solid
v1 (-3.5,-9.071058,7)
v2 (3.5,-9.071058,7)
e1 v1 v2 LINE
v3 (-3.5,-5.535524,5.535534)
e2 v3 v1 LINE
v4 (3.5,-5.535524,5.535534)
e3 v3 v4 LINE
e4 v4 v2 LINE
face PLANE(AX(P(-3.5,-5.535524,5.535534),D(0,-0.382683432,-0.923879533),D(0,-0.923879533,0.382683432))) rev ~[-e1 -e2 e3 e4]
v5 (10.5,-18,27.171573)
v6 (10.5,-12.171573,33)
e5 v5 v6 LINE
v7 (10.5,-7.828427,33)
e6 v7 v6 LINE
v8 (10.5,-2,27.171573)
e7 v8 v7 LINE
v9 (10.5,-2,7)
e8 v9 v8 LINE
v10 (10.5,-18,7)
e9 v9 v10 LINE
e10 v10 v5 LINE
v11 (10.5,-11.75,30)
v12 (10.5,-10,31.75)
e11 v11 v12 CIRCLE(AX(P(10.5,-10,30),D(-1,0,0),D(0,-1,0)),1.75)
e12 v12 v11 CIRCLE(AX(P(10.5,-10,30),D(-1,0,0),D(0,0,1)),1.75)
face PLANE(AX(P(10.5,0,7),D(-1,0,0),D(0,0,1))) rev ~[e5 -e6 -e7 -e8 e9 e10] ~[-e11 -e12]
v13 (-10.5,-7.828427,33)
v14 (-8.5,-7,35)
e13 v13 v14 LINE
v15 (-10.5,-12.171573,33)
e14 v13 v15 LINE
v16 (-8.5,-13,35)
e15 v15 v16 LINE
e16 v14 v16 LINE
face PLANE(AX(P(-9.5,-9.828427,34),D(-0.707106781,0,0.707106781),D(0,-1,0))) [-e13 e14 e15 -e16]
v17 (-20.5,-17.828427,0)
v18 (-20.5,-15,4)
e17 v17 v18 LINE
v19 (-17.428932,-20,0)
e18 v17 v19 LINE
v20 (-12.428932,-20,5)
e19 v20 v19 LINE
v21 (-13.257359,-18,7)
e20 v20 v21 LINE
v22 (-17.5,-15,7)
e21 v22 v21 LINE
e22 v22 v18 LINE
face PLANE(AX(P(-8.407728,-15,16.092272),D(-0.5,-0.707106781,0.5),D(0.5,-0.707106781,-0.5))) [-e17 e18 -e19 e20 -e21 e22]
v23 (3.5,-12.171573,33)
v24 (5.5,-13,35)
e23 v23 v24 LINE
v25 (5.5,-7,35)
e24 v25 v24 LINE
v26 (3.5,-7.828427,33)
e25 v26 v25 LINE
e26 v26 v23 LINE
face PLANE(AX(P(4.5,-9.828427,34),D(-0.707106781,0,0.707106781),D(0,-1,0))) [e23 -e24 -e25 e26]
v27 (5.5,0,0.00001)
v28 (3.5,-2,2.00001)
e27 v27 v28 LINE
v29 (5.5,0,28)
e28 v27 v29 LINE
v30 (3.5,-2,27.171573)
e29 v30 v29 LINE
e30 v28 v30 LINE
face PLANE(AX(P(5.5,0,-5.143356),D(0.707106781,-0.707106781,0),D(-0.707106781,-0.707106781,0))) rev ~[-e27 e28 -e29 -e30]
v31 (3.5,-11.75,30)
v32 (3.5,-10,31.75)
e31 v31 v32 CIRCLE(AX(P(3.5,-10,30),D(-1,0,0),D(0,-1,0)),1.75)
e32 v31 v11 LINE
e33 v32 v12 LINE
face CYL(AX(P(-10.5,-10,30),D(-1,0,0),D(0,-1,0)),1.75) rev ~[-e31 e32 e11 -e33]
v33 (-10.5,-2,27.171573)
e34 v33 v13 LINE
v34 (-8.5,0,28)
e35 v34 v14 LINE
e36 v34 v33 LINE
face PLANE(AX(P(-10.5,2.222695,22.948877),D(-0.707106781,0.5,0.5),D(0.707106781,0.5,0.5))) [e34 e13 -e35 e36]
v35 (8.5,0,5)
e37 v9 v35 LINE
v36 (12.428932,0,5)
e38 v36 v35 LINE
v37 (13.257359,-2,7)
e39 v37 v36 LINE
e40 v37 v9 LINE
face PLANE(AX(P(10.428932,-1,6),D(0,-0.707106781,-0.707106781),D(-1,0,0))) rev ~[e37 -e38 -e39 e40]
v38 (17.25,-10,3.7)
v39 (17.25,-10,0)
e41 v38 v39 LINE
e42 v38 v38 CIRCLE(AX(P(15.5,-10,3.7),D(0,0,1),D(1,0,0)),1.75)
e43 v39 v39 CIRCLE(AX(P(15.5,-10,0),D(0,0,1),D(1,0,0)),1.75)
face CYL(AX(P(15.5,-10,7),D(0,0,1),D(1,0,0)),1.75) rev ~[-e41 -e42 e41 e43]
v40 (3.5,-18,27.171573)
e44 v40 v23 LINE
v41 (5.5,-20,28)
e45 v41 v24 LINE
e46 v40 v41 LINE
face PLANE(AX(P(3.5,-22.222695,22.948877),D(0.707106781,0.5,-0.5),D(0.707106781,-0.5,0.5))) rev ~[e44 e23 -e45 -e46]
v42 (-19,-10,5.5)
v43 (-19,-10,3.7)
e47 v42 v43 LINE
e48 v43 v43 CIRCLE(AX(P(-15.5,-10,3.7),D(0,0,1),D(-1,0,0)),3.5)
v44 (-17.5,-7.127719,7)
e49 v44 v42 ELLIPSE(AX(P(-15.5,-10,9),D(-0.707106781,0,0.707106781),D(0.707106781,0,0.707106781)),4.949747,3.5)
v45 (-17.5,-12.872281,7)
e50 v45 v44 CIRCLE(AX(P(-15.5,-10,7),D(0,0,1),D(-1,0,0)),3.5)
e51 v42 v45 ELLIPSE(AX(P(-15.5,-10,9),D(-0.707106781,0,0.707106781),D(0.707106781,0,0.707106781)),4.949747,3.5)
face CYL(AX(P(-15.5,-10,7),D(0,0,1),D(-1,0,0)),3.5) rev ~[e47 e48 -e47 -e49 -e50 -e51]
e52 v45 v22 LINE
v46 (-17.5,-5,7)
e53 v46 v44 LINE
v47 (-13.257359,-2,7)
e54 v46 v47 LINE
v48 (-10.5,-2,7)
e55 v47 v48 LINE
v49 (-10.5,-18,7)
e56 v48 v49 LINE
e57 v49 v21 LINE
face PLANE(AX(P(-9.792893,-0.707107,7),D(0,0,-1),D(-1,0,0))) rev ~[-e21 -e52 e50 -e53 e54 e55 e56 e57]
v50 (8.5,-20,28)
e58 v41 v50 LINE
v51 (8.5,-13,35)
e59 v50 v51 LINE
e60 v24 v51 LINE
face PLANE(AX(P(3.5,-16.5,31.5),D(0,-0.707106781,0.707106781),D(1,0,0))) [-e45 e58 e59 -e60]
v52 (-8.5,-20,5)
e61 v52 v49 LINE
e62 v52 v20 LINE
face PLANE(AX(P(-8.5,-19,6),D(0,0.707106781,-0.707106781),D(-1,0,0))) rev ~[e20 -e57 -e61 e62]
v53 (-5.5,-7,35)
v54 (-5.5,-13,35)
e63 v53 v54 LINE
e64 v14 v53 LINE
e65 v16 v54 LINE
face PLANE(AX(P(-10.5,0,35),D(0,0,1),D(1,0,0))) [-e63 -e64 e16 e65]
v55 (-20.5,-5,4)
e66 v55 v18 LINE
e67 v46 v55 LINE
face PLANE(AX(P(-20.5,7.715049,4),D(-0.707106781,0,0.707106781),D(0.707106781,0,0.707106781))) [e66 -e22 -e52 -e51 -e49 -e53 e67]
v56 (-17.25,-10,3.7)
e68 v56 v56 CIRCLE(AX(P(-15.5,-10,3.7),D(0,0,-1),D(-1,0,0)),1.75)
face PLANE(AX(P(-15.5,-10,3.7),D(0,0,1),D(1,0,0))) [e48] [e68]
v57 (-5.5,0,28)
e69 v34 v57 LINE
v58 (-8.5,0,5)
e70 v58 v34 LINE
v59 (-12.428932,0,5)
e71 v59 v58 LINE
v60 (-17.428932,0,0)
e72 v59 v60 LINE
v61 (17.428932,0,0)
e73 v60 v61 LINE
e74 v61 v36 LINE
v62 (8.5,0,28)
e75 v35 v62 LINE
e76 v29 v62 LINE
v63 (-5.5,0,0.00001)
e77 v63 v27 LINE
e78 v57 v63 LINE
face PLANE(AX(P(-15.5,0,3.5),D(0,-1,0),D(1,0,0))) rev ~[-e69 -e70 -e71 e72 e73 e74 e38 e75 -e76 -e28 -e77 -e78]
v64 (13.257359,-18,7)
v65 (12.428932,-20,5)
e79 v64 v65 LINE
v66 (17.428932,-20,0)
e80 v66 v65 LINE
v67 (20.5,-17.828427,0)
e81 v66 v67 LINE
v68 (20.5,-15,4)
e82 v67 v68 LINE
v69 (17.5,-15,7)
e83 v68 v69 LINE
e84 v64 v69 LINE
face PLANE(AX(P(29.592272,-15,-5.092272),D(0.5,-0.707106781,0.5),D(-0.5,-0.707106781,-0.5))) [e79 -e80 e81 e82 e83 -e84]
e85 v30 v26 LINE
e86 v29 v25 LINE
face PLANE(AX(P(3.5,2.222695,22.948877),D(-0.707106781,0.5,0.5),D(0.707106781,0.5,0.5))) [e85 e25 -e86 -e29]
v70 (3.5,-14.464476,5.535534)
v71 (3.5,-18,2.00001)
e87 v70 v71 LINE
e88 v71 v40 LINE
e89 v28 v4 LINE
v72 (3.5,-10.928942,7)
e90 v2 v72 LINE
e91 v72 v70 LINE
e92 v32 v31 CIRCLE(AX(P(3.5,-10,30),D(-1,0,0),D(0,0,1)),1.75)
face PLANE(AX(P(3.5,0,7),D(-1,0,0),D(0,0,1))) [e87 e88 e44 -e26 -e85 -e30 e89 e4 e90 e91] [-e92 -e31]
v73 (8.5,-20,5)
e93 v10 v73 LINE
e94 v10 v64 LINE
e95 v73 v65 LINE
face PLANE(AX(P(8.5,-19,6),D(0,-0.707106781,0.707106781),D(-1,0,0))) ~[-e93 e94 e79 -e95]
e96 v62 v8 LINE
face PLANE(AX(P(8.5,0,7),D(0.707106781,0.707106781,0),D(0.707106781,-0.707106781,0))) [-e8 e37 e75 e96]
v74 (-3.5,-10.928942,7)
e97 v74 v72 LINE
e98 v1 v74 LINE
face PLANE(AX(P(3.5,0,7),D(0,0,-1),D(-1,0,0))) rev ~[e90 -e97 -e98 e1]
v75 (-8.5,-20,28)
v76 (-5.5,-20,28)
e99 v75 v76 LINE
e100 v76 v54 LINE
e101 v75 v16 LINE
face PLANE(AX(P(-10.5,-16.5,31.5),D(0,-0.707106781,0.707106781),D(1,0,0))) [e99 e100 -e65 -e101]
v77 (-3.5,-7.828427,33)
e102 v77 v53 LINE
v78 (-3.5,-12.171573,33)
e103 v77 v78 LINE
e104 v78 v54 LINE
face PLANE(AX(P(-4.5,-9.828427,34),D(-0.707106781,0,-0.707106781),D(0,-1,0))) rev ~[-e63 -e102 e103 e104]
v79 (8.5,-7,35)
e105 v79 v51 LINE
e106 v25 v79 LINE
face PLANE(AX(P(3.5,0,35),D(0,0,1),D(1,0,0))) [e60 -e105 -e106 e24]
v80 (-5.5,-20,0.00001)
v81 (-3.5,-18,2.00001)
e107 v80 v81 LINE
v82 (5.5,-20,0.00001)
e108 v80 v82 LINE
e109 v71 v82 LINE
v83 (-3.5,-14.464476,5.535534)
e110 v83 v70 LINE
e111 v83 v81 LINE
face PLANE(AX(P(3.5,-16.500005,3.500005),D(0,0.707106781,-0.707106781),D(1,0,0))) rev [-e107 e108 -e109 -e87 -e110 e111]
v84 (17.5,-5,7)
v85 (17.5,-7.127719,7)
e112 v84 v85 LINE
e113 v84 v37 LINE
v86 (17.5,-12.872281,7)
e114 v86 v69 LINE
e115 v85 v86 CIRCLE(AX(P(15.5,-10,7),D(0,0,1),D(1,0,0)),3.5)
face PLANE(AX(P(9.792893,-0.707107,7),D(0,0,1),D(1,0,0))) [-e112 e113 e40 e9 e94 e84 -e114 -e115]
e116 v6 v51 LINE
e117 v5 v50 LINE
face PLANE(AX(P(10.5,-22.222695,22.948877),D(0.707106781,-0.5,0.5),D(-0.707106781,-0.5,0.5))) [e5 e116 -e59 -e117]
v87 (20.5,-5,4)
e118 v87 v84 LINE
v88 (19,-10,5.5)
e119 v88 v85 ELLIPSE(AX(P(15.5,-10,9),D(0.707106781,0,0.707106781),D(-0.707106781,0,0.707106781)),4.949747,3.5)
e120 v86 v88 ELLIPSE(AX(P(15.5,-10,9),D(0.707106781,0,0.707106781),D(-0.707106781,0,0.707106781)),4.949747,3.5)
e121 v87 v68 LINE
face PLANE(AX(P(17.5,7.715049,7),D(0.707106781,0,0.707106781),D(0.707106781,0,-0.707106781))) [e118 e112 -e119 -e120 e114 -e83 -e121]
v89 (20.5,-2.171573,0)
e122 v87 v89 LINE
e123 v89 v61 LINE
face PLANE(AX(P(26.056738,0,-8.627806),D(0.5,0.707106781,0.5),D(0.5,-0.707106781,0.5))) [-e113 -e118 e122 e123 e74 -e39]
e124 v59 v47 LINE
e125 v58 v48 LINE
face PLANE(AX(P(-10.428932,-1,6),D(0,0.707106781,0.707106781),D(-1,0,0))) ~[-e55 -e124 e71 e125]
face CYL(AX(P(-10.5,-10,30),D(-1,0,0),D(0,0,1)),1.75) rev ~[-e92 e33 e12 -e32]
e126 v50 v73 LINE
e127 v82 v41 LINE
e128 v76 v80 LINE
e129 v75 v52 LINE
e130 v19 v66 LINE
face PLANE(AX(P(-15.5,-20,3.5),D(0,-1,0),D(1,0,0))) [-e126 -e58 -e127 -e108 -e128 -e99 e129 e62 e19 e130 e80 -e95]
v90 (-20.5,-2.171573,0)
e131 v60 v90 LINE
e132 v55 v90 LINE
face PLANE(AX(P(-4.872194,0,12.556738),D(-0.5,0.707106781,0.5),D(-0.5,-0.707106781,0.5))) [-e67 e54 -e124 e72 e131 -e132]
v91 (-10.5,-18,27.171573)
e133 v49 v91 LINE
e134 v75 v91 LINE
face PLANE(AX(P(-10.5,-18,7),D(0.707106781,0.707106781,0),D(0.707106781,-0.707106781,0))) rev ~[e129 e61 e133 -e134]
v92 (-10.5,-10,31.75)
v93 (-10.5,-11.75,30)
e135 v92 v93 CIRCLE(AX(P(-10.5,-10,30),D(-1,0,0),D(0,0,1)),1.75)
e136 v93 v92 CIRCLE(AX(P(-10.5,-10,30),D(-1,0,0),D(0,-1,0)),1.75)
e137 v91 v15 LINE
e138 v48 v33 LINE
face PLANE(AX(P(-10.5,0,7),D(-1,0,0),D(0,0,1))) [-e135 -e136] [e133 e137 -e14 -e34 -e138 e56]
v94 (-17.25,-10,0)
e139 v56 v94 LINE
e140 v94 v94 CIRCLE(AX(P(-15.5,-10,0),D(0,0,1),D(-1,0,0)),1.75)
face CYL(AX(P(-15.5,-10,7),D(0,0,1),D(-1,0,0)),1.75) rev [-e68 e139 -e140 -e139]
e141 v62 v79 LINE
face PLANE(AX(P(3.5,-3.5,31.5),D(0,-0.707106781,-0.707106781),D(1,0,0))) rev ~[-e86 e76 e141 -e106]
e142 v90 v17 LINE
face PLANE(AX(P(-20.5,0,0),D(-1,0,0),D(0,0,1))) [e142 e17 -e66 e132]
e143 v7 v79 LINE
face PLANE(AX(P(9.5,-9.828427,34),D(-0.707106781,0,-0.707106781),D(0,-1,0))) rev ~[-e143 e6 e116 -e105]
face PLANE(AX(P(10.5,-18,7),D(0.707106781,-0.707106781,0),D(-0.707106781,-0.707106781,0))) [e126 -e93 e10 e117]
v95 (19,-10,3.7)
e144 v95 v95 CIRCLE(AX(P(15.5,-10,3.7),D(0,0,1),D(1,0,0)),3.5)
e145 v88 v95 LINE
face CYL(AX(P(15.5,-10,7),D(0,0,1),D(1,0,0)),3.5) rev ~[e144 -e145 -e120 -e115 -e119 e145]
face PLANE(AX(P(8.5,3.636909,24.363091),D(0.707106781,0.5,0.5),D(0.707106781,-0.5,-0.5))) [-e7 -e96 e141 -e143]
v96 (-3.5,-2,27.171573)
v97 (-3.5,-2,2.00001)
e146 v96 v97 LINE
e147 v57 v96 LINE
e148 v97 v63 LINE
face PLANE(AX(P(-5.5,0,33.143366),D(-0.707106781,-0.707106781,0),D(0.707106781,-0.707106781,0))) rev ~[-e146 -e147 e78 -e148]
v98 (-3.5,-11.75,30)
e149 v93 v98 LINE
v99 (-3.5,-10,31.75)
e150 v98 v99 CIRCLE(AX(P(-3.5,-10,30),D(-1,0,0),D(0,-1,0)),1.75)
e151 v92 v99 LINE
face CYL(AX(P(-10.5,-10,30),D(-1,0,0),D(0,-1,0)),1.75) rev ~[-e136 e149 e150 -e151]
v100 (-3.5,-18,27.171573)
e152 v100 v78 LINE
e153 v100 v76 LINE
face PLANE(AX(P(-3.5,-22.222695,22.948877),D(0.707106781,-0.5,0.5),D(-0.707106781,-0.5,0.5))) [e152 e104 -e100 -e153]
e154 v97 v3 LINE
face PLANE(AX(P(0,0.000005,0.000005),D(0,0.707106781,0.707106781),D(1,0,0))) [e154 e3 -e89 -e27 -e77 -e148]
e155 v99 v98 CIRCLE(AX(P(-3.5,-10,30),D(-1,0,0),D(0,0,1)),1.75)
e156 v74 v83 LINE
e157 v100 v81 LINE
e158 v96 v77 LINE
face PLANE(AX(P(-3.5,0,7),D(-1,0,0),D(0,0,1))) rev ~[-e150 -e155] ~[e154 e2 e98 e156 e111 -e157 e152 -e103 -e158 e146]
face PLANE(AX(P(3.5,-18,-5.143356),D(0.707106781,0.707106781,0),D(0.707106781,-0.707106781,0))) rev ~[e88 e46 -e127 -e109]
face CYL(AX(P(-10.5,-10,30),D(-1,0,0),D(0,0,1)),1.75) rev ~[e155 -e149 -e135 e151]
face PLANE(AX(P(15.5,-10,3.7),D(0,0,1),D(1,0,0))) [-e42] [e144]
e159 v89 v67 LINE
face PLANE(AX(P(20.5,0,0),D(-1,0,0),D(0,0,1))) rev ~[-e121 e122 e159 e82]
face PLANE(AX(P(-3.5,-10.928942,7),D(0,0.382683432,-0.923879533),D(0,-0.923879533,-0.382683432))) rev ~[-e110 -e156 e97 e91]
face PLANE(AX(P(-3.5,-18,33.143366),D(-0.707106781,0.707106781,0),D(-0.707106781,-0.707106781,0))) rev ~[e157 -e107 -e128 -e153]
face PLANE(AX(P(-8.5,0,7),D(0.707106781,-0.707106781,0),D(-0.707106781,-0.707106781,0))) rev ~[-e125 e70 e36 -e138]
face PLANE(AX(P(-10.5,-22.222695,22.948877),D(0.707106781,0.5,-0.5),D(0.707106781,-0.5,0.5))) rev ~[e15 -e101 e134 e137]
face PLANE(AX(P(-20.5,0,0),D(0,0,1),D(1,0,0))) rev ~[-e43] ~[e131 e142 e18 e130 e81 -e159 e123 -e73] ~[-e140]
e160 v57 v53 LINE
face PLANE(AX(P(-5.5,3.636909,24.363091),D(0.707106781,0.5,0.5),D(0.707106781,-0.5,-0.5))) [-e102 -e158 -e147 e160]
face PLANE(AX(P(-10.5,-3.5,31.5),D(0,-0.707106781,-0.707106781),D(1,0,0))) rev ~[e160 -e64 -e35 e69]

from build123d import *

# Parameters (mm, degrees)
F0_W          = 10
F0_H          = 7
F0_W_2        = 7
F0_H_2        = 28
F1_DEPTH      = 20
F2_R          = 3.5
F2_R_2        = 1.75
F3_DEPTH      = 3.3
F4_DEPTH      = 25
F6_DEPTH      = 3.3
F7_DEPTH      = 25
F9_DEPTH      = 25
F10_SIZE      = 7
F11_T1_DEPTH  = 35.4300979278
F12_SIZE      = 6.99999
F13_T1_DEPTH  = 7
F13_T6_DEPTH  = 29.9594705668
F13_T11_DEPTH = 29.9594705668
F13_T16_DEPTH = 29.9594705668
F13_T21_DEPTH = 29.9594705668
F14_T1_DEPTH  = 26.1433659759
F14_T3_DEPTH  = 20.1862268885
F14_T5_DEPTH  = 20.1862268885
F14_T10_DEPTH = 38.2867219519
F14_T15_DEPTH = 38.2867219519
F14_T20_DEPTH = 38.2867219519
F14_T25_DEPTH = 38.2867219519
F15_SIZE      = 2
F16_SIZE      = 2


# Not quite as in the source:
# - a fillet or chamfer that OpenCascade refuses, or shapes differently, is made with other operations: its cross-section is extruded or revolved along the edge and cut away or added
# - a fillet or chamfer is up to 0.001 mm smaller than in the source, because OpenCascade refuses the exact size


with BuildPart() as f1:
    # F0 (on Front) → F1 (new body)
    with BuildSketch(Plane.XZ):
        with Locations((-15.5, 3.5)):
            Rectangle(F0_W, F0_H)
        with Locations((-7, 3.5)):
            Rectangle(F0_W_2, F0_H)
        with Locations((0, 3.5)):
            Rectangle(F0_W_2, F0_H)
        with Locations((-7, 21)):
            Rectangle(F0_W_2, F0_H_2)
        with Locations((7, 3.5)):
            Rectangle(F0_W_2, F0_H)
        with Locations((15.5, 3.5)):
            Rectangle(F0_W, F0_H)
        with Locations((7, 21)):
            Rectangle(F0_W_2, F0_H_2)
    extrude(amount=F1_DEPTH)

    # F2 (on face) → F3 (cut)
    with BuildSketch(Plane.XY.offset(7)):
        with Locations((15.5, -10)):
            Circle(F2_R)
        with Locations((15.5, -10)):
            Circle(F2_R_2, mode=Mode.SUBTRACT)
    extrude(amount=-F3_DEPTH, mode=Mode.SUBTRACT)

    # F2 (on face) → F4 (cut)
    with BuildSketch(Plane.XY.offset(7)):
        with Locations((15.5, -10)):
            Circle(F2_R_2)
    extrude(amount=-F4_DEPTH, mode=Mode.SUBTRACT)

    # F5 (on face) → F6 (cut)
    with BuildSketch(Plane.XY.offset(7)):
        with BuildLine():
            ThreePointArc((-12, -10), (-15.5, -6.5), (-19, -10))
            ThreePointArc((-19, -10), (-15.5, -13.5), (-12, -10))
        make_face()
        with BuildLine():
            ThreePointArc((-13.75, -10), (-15.5, -11.75), (-17.25, -10))
            ThreePointArc((-17.25, -10), (-15.5, -8.25), (-13.75, -10))
        make_face(mode=Mode.SUBTRACT)
    extrude(amount=-F6_DEPTH, mode=Mode.SUBTRACT)

    # F7 (cut): a face of the model
    f7_faces = [f1.faces().sort_by_distance(p)[0] for p in [
        (-15.5, -10, 7),
    ]]
    extrude(f7_faces, amount=-F7_DEPTH, mode=Mode.SUBTRACT)

    # F8 (on face) → F9 (cut)
    with BuildSketch(Plane(origin=(-10.5, 0, 0), x_dir=(0, -1, 0), z_dir=(-1, 0, 0))):
        with BuildLine():
            ThreePointArc((10, 31.75), (8.7625631329, 28.7625631329), (11.75, 30))
            ThreePointArc((11.75, 30), (11.2374368671, 31.2374368671), (10, 31.75))
        make_face()
    extrude(amount=-F9_DEPTH, mode=Mode.SUBTRACT)

    # F10
    f10_edges = [f1.edges().sort_by_distance(p)[0] for p in [
        (-7, -20, 35),
        (-7, 0, 35),
        (7, 0, 35),
        (7, -20, 35),
    ]]
    chamfer(f10_edges, length=F10_SIZE)

    # F11: chamfer of 3 on 2 edges, made by hand

    # F11_s2 → F11_t1 (cut)
    with BuildSketch(Plane.XZ.offset(-7.7150489639)):
        Polygon((17.5, 7), (20.5, 4), (20.5, 7), align=None)
        Polygon((-20.5, 4), (-17.5, 7), (-20.5, 7), align=None)
    extrude(amount=F11_T1_DEPTH, mode=Mode.SUBTRACT)

    # F12 (size 7 in the source; OpenCascade refuses exactly that, so slightly less here)
    f12_edges = [f1.edges().sort_by_distance(p)[0] for p in [
        (0, 0, 7),
        (0, -20, 7),
    ]]
    chamfer(f12_edges, length=F12_SIZE)

    # F13: chamfer of 5 on 6 edges, made by hand

    # F13_s2 → F13_t1 (cut)
    with BuildSketch(Plane.YZ.offset(-3.5)):
        Polygon((-5.5355239059, 5.5355339059), (-9.0710578119, 7), (-6.99999, 7), align=None)
        Polygon((-10.9289421881, 7), (-14.4644760941, 5.5355339059), (-13.00001, 7), align=None)
    extrude(amount=F13_T1_DEPTH, mode=Mode.SUBTRACT)


with BuildPart() as f13_tool4:
    # F13_s5 → F13_t6 (new body)
    with BuildSketch(Plane(origin=(17.3422723993, 0, -17.3422723993), x_dir=(0, 1, 0), z_dir=(-0.7071067812, 0, 0.7071067812))):
        Polygon((-15, -17.3241161391), (-20, -12.3241161391), (-20, -17.3241161391), align=None)
    extrude(amount=F13_T6_DEPTH)

    split(bisect_by=Plane.XY.offset(7), keep=Keep.BOTTOM)


with BuildPart() as f1_1:
    add(f1.part)

    # F13_t3: cut F13_tool4
    add(f13_tool4.part, mode=Mode.SUBTRACT)


with BuildPart() as f13_tool9:
    # F13_s10 → F13_t11 (new body)
    with BuildSketch(Plane(origin=(17.3422723993, 0, -17.3422723993), x_dir=(0, 1, 0), z_dir=(-0.7071067812, 0, 0.7071067812))):
        Polygon((0, -12.3241161391), (-5, -17.3241161391), (0, -17.3241161391), align=None)
    extrude(amount=F13_T11_DEPTH)

    split(bisect_by=Plane.XY.offset(7), keep=Keep.BOTTOM)


with BuildPart() as f1_2:
    add(f1_1.part)

    # F13_t8: cut F13_tool9
    add(f13_tool9.part, mode=Mode.SUBTRACT)


with BuildPart() as f13_tool14:
    # F13_s15 → F13_t16 (new body)
    with BuildSketch(Plane(origin=(3.8422723993, 0, 3.8422723993), x_dir=(0, 1, 0), z_dir=(-0.7071067812, 0, -0.7071067812))):
        Polygon((0, -12.3241161391), (-5, -17.3241161391), (0, -17.3241161391), align=None)
    extrude(amount=F13_T16_DEPTH)

    split(bisect_by=Plane.XY.offset(7), keep=Keep.BOTTOM)


with BuildPart() as f1_3:
    add(f1_2.part)

    # F13_t13: cut F13_tool14
    add(f13_tool14.part, mode=Mode.SUBTRACT)


with BuildPart() as f13_tool19:
    # F13_s20 → F13_t21 (new body)
    with BuildSketch(Plane(origin=(3.8422723993, 0, 3.8422723993), x_dir=(0, 1, 0), z_dir=(-0.7071067812, 0, -0.7071067812))):
        Polygon((-15, -17.3241161391), (-20, -12.3241161391), (-20, -17.3241161391), align=None)
    extrude(amount=F13_T21_DEPTH)

    split(bisect_by=Plane.XY.offset(7), keep=Keep.BOTTOM)


with BuildPart() as f1_4:
    add(f1_3.part)

    # F13_t18: cut F13_tool19
    add(f13_tool19.part, mode=Mode.SUBTRACT)

    # F14: chamfer of 2 on 16 edges, made by hand

    # F14_s2 → F14_t1 (cut)
    with BuildSketch(Plane.XY.offset(7)):
        Polygon((-10.5, -18), (-8.5, -20), (-10.5, -20), align=None)
        Polygon((10.5, -18), (8.5, -20), (10.5, -20), align=None)
        Polygon((8.5, 0), (10.5, -2), (10.5, 0), align=None)
        Polygon((-8.5, 0), (-10.5, -2), (-10.5, 0), align=None)
    extrude(amount=F14_T1_DEPTH, mode=Mode.SUBTRACT)

    # F14_s4 → F14_t3 (cut)
    with BuildSketch(Plane(origin=(0, 0.3630910403, 0.3630910403), x_dir=(1, 0, 0), z_dir=(0, 0.7071067812, 0.7071067812))):
        Polygon((10.5, -31.941125497), (8.5, -33.941125497), (10.5, -33.941125497), align=None)
        Polygon((3.5, -31.941125497), (5.5, -33.941125497), (3.5, -33.941125497), align=None)
        Polygon((-10.5, -31.941125497), (-8.5, -33.941125497), (-10.5, -33.941125497), align=None)
        Polygon((-3.5, -31.941125497), (-5.5, -33.941125497), (-3.5, -33.941125497), align=None)
    extrude(amount=F14_T3_DEPTH, mode=Mode.SUBTRACT)

    # F14_s6 → F14_t5 (cut)
    with BuildSketch(Plane(origin=(0, -10.3630910403, 10.3630910403), x_dir=(1, 0, 0), z_dir=(0, -0.7071067812, 0.7071067812))):
        Polygon((3.5, 17.7989898732), (5.5, 19.7989898732), (3.5, 19.7989898732), align=None)
        Polygon((8.5, 19.7989898732), (10.5, 17.7989898732), (10.5, 19.7989898732), align=None)
        Polygon((-5.5, 19.7989898732), (-3.5, 17.7989898732), (-3.5, 19.7989898732), align=None)
        Polygon((-10.5, 17.7989898732), (-8.5, 19.7989898732), (-10.5, 19.7989898732), align=None)
    extrude(amount=F14_T5_DEPTH, mode=Mode.SUBTRACT)


with BuildPart() as f14_tool8:
    # F14_s9 → F14_t10 (new body)
    with BuildSketch(Plane.XY.offset(33.1433659759)):
        Polygon((-3.5, -18), (-5.5, -20), (-3.5, -20), align=None)
    extrude(amount=-F14_T10_DEPTH)

    split(bisect_by=Plane(origin=(0, -10.000005, 10.000005), x_dir=(1, 0, 0), z_dir=(0, -0.7071067812, 0.7071067812)), keep=Keep.TOP)


with BuildPart() as f1_5:
    add(f1_4.part)

    # F14_t7: cut F14_tool8
    add(f14_tool8.part, mode=Mode.SUBTRACT)


with BuildPart() as f14_tool13:
    # F14_s14 → F14_t15 (new body)
    with BuildSketch(Plane.XY.offset(-5.1433559759)):
        Polygon((3.5, -18), (5.5, -20), (3.5, -20), align=None)
    extrude(amount=F14_T15_DEPTH)

    split(bisect_by=Plane(origin=(0, -10.000005, 10.000005), x_dir=(1, 0, 0), z_dir=(0, -0.7071067812, 0.7071067812)), keep=Keep.TOP)


with BuildPart() as f1_6:
    add(f1_5.part)

    # F14_t12: cut F14_tool13
    add(f14_tool13.part, mode=Mode.SUBTRACT)


with BuildPart() as f14_tool18:
    # F14_s19 → F14_t20 (new body)
    with BuildSketch(Plane.XY.offset(-5.1433559759)):
        Polygon((5.5, 0), (3.5, -2), (3.5, 0), align=None)
    extrude(amount=F14_T20_DEPTH)

    split(bisect_by=Plane(origin=(0, 5e-06, 5e-06), x_dir=(1, 0, 0), z_dir=(0, 0.7071067812, 0.7071067812)), keep=Keep.TOP)


with BuildPart() as f1_7:
    add(f1_6.part)

    # F14_t17: cut F14_tool18
    add(f14_tool18.part, mode=Mode.SUBTRACT)


with BuildPart() as f14_tool23:
    # F14_s24 → F14_t25 (new body)
    with BuildSketch(Plane.XY.offset(33.1433659759)):
        Polygon((-5.5, 0), (-3.5, -2), (-3.5, 0), align=None)
    extrude(amount=-F14_T25_DEPTH)

    split(bisect_by=Plane(origin=(0, 5e-06, 5e-06), x_dir=(1, 0, 0), z_dir=(0, 0.7071067812, 0.7071067812)), keep=Keep.TOP)


with BuildPart() as f1_8:
    add(f1_7.part)

    # F14_t22: cut F14_tool23
    add(f14_tool23.part, mode=Mode.SUBTRACT)

    # F15
    f15_edges = [f1_8.edges().sort_by_distance(p)[0] for p in [
        (10.5, -10, 35),
        (3.5, -10, 35),
        (-3.5, -10, 35),
        (-10.5, -10, 35),
    ]]
    chamfer(f15_edges, length=F15_SIZE)

    # F16
    f16_edges = [f1_8.edges().sort_by_distance(p)[0] for p in [
        (-9.464466, 0, 7),
        (9.464466, 0, 7),
        (-9.464466, -20, 7),
        (9.464466, -20, 7),
    ]]
    chamfer(f16_edges, length=F16_SIZE)


solid = f1_8.part
